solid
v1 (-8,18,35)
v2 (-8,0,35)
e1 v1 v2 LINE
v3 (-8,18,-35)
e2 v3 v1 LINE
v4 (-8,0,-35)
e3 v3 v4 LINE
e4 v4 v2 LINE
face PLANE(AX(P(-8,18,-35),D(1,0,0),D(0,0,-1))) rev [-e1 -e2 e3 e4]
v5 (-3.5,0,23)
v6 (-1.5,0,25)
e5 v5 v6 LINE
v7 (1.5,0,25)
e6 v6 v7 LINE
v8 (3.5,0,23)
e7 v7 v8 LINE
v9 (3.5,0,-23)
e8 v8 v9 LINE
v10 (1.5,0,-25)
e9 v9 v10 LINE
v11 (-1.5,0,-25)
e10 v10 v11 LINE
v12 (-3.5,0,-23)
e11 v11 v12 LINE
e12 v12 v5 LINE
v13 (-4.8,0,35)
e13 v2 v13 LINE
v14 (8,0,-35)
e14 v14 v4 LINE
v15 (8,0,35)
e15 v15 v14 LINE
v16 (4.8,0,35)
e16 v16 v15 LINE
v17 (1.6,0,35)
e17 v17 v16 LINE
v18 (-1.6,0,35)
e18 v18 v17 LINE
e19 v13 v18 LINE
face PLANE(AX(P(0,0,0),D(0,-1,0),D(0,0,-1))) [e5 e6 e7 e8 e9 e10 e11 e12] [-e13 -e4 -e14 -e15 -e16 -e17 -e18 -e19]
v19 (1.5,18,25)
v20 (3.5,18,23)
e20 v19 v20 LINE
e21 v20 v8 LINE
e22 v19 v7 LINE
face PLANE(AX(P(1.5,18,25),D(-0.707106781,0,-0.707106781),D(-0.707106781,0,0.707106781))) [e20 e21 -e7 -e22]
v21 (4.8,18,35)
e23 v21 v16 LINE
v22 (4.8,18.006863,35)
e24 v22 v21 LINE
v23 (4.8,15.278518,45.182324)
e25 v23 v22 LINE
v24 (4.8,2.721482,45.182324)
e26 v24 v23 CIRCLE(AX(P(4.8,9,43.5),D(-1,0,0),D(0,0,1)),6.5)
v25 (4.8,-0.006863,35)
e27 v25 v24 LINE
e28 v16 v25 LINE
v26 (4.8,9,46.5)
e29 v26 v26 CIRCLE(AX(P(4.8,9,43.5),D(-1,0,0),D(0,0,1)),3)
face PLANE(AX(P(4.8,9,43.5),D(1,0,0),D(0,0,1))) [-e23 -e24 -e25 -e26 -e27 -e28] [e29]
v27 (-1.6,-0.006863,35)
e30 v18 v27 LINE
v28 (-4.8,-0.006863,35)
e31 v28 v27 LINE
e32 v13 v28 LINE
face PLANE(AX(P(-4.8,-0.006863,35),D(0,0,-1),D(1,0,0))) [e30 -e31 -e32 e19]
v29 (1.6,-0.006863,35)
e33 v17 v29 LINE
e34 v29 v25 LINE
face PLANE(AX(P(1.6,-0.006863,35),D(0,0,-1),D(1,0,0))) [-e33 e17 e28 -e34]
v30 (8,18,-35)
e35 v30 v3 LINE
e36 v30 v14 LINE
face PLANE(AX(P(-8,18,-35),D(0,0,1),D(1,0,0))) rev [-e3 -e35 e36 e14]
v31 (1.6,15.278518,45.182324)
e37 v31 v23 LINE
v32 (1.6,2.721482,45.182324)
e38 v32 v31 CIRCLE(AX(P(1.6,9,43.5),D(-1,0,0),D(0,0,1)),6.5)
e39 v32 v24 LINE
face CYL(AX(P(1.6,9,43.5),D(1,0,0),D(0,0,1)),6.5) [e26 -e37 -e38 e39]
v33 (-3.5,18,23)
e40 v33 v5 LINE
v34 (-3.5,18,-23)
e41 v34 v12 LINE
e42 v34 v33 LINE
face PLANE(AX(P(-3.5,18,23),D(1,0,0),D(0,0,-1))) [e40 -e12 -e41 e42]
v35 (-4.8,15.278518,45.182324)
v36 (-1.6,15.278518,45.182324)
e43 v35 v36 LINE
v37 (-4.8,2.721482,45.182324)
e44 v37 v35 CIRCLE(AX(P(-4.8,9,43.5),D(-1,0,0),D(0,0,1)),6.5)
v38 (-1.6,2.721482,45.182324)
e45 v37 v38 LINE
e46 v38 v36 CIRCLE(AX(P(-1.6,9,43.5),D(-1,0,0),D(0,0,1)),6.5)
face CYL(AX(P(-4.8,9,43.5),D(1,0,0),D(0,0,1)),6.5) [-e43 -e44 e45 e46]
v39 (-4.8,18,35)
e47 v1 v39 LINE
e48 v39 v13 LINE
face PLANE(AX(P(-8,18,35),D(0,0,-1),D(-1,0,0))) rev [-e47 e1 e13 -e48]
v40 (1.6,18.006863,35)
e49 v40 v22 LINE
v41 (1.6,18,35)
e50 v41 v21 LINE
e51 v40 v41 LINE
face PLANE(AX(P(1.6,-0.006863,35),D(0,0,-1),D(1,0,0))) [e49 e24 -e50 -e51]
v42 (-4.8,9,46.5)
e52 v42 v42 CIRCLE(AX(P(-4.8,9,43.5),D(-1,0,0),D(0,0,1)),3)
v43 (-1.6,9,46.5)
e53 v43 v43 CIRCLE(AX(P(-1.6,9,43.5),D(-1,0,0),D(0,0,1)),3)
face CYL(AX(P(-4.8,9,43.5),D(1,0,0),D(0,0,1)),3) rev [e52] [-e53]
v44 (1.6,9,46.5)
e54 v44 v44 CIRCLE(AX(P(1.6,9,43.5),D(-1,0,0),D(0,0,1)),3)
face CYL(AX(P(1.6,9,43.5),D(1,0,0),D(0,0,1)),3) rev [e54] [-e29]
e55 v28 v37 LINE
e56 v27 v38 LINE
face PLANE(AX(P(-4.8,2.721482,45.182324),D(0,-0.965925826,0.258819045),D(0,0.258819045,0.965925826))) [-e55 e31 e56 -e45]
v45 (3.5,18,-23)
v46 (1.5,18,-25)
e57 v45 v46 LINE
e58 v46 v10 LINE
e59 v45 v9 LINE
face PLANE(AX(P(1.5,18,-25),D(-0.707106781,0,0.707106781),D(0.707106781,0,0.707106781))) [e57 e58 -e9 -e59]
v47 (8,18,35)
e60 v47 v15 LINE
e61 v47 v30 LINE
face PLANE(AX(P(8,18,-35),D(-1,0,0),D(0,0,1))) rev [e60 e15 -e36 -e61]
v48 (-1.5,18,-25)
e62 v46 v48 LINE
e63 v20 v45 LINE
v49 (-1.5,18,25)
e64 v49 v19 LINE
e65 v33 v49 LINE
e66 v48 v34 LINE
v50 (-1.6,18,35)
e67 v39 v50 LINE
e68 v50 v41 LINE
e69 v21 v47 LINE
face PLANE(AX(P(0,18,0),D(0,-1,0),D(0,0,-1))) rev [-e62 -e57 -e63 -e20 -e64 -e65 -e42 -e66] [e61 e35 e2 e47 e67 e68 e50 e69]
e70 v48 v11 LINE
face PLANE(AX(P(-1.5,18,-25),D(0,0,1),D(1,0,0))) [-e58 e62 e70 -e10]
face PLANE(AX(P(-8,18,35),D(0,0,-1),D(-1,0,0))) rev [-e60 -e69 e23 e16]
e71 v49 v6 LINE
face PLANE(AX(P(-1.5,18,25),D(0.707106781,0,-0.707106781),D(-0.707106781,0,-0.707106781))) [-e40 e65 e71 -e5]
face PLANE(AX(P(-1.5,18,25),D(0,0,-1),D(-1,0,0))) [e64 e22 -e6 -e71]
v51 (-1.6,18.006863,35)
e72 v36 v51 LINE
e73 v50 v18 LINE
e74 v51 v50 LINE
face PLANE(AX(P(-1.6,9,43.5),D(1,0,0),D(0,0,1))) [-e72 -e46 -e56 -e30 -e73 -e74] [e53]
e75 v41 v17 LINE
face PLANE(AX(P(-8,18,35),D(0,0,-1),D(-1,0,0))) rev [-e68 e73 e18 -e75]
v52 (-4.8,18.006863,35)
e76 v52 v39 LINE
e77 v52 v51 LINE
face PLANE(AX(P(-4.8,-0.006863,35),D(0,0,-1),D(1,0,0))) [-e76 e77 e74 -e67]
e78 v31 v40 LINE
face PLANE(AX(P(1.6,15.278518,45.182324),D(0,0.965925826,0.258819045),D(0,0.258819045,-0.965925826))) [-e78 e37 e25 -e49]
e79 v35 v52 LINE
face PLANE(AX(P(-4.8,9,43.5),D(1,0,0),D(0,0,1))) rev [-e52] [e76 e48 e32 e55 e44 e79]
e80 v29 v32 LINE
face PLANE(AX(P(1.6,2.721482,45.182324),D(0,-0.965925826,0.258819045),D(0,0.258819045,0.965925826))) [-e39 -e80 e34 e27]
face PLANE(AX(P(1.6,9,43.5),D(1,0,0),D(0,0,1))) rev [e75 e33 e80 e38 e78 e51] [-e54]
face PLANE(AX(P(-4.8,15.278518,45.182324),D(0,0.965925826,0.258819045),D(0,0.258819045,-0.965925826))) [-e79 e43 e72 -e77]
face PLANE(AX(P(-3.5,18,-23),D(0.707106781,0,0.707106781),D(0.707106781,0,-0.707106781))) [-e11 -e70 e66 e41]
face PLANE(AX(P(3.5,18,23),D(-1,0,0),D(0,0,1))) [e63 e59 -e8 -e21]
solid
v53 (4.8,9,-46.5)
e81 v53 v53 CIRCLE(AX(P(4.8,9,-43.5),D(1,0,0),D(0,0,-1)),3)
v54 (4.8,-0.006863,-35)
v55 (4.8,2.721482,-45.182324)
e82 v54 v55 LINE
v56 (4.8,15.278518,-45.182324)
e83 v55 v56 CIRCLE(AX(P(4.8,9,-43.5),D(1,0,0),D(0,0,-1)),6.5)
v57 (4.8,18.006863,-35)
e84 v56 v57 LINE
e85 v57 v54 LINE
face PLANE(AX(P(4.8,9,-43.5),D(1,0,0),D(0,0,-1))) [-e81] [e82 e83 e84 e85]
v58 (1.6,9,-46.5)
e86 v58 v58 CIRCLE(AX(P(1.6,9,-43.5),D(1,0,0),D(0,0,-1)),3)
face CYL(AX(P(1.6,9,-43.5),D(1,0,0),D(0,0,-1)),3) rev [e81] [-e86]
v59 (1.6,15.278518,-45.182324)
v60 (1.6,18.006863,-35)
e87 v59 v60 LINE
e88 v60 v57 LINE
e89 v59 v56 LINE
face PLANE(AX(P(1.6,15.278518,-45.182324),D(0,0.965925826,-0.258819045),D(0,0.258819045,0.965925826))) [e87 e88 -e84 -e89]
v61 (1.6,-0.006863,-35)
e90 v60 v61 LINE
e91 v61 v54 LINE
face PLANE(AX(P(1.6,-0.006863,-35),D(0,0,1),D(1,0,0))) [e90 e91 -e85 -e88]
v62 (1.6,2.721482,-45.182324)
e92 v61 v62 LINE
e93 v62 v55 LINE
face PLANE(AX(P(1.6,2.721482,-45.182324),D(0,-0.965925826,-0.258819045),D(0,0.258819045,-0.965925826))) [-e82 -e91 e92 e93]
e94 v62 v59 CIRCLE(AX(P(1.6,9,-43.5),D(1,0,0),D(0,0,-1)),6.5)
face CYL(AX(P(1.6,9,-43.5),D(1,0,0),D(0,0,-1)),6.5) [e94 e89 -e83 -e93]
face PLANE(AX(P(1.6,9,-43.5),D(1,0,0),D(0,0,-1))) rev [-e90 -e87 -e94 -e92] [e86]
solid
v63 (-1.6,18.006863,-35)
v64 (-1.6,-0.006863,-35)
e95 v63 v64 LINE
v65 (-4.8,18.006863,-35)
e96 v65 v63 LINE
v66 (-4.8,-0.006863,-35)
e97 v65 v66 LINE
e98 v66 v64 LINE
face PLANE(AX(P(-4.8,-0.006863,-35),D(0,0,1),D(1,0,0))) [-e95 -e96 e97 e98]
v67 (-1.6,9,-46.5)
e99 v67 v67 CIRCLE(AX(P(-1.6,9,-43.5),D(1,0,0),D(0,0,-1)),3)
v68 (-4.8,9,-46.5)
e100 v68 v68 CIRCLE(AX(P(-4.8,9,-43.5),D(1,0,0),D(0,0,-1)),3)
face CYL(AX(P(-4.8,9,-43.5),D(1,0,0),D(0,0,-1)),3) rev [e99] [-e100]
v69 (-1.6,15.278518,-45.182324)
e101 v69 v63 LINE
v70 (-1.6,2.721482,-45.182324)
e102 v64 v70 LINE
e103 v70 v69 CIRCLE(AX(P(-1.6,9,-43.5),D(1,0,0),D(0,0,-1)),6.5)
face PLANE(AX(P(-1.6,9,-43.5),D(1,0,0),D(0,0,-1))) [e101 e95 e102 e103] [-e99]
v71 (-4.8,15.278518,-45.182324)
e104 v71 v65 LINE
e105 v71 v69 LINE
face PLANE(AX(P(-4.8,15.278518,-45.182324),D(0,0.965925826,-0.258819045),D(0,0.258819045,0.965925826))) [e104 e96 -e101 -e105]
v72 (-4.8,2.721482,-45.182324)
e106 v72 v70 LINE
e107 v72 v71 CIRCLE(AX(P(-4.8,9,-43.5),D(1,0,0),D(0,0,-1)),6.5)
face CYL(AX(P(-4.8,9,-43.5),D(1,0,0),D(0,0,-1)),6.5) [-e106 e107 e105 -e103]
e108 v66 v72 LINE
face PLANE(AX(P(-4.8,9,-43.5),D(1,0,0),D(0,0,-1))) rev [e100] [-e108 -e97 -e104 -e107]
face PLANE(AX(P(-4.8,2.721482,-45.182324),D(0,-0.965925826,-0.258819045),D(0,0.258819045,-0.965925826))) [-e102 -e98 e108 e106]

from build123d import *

# Parameters (mm, degrees)
SKETCH1_W           = 16
SKETCH1_H           = 70
BOSS_EXTRUDE1_DEPTH = 18
SKETCH2_R           = 3
BOSS_EXTRUDE2_DEPTH = 3.2
MIRROR3_START       = -4.8
MIRROR3_OUTLINE_R   = 3
MIRROR3_DEPTH       = 3.2
MIRROR3_START_2     = 1.6
MIRROR3_2_OUTLINE_R = 3
MIRROR3_2_DEPTH     = 3.2


# Read off the part's stored shape, not the designer's step: Mirror3
with BuildPart() as part:
    # Sketch1 → Boss-Extrude1 (new body)
    with BuildSketch(Plane(origin=(0, 0, 0), x_dir=(1, 0, 0), z_dir=(0, 1, 0))):
        Rectangle(SKETCH1_W, SKETCH1_H)
        Polygon((-3.5, 23), (-1.5, 25), (1.5, 25), (3.5, 23), (3.5, -23), (1.5, -25), (-1.5, -25), (-3.5, -23), align=None, mode=Mode.SUBTRACT)
    extrude(amount=BOSS_EXTRUDE1_DEPTH)

    # Mirror3 outline → Mirror3 (add)
    with BuildSketch(Plane.YZ.offset(MIRROR3_START)):
        with BuildLine():
            Line((-0.006863308, 35), (18.006863308, 35))
            Line((18.006863308, 35), (15.278517871, 45.182323793))
            ThreePointArc((15.278517871, 45.182323793), (9, 50), (2.721482129, 45.182323793))
            Line((2.721482129, 45.182323793), (-0.006863308, 35))
        make_face()
        with Locations((9, 43.5)):
            Circle(MIRROR3_OUTLINE_R, mode=Mode.SUBTRACT)
    extrude(amount=MIRROR3_DEPTH)

    # Mirror3 2 outline → Mirror3 2 (add)
    with BuildSketch(Plane.YZ.offset(MIRROR3_START_2)):
        with BuildLine():
            Line((-0.006863308, 35), (18.006863308, 35))
            Line((18.006863308, 35), (15.278517871, 45.182323793))
            ThreePointArc((15.278517871, 45.182323793), (9, 50), (2.721482129, 45.182323793))
            Line((2.721482129, 45.182323793), (-0.006863308, 35))
        make_face()
        with Locations((9, 43.5)):
            Circle(MIRROR3_2_OUTLINE_R, mode=Mode.SUBTRACT)
    extrude(amount=MIRROR3_2_DEPTH)


with BuildPart() as body_2:
    # Sketch2 → Boss-Extrude2 (new body)
    with BuildSketch(Plane(origin=(4.8, 0, 0), x_dir=(0, 0, -1), z_dir=(1, 0, 0))):
        with BuildLine():
            Line((45.182323793, 2.721482129), (35, -0.006863308))
            Line((35, -0.006863308), (35, 18.006863308))
            Line((35, 18.006863308), (45.182323793, 15.278517871))
            ThreePointArc((45.182323793, 15.278517871), (50, 9), (45.182323793, 2.721482129))
        make_face()
        with Locations((43.5, 9)):
            Circle(SKETCH2_R, mode=Mode.SUBTRACT)
    extrude(amount=-BOSS_EXTRUDE2_DEPTH)


with BuildPart() as body_3:
    # Body-Move/Copy1: copy of body 2
    add(body_2.part.moved(Location((-6.4, 0, 0))))


solid = Compound([part.part, body_2.part, body_3.part])
